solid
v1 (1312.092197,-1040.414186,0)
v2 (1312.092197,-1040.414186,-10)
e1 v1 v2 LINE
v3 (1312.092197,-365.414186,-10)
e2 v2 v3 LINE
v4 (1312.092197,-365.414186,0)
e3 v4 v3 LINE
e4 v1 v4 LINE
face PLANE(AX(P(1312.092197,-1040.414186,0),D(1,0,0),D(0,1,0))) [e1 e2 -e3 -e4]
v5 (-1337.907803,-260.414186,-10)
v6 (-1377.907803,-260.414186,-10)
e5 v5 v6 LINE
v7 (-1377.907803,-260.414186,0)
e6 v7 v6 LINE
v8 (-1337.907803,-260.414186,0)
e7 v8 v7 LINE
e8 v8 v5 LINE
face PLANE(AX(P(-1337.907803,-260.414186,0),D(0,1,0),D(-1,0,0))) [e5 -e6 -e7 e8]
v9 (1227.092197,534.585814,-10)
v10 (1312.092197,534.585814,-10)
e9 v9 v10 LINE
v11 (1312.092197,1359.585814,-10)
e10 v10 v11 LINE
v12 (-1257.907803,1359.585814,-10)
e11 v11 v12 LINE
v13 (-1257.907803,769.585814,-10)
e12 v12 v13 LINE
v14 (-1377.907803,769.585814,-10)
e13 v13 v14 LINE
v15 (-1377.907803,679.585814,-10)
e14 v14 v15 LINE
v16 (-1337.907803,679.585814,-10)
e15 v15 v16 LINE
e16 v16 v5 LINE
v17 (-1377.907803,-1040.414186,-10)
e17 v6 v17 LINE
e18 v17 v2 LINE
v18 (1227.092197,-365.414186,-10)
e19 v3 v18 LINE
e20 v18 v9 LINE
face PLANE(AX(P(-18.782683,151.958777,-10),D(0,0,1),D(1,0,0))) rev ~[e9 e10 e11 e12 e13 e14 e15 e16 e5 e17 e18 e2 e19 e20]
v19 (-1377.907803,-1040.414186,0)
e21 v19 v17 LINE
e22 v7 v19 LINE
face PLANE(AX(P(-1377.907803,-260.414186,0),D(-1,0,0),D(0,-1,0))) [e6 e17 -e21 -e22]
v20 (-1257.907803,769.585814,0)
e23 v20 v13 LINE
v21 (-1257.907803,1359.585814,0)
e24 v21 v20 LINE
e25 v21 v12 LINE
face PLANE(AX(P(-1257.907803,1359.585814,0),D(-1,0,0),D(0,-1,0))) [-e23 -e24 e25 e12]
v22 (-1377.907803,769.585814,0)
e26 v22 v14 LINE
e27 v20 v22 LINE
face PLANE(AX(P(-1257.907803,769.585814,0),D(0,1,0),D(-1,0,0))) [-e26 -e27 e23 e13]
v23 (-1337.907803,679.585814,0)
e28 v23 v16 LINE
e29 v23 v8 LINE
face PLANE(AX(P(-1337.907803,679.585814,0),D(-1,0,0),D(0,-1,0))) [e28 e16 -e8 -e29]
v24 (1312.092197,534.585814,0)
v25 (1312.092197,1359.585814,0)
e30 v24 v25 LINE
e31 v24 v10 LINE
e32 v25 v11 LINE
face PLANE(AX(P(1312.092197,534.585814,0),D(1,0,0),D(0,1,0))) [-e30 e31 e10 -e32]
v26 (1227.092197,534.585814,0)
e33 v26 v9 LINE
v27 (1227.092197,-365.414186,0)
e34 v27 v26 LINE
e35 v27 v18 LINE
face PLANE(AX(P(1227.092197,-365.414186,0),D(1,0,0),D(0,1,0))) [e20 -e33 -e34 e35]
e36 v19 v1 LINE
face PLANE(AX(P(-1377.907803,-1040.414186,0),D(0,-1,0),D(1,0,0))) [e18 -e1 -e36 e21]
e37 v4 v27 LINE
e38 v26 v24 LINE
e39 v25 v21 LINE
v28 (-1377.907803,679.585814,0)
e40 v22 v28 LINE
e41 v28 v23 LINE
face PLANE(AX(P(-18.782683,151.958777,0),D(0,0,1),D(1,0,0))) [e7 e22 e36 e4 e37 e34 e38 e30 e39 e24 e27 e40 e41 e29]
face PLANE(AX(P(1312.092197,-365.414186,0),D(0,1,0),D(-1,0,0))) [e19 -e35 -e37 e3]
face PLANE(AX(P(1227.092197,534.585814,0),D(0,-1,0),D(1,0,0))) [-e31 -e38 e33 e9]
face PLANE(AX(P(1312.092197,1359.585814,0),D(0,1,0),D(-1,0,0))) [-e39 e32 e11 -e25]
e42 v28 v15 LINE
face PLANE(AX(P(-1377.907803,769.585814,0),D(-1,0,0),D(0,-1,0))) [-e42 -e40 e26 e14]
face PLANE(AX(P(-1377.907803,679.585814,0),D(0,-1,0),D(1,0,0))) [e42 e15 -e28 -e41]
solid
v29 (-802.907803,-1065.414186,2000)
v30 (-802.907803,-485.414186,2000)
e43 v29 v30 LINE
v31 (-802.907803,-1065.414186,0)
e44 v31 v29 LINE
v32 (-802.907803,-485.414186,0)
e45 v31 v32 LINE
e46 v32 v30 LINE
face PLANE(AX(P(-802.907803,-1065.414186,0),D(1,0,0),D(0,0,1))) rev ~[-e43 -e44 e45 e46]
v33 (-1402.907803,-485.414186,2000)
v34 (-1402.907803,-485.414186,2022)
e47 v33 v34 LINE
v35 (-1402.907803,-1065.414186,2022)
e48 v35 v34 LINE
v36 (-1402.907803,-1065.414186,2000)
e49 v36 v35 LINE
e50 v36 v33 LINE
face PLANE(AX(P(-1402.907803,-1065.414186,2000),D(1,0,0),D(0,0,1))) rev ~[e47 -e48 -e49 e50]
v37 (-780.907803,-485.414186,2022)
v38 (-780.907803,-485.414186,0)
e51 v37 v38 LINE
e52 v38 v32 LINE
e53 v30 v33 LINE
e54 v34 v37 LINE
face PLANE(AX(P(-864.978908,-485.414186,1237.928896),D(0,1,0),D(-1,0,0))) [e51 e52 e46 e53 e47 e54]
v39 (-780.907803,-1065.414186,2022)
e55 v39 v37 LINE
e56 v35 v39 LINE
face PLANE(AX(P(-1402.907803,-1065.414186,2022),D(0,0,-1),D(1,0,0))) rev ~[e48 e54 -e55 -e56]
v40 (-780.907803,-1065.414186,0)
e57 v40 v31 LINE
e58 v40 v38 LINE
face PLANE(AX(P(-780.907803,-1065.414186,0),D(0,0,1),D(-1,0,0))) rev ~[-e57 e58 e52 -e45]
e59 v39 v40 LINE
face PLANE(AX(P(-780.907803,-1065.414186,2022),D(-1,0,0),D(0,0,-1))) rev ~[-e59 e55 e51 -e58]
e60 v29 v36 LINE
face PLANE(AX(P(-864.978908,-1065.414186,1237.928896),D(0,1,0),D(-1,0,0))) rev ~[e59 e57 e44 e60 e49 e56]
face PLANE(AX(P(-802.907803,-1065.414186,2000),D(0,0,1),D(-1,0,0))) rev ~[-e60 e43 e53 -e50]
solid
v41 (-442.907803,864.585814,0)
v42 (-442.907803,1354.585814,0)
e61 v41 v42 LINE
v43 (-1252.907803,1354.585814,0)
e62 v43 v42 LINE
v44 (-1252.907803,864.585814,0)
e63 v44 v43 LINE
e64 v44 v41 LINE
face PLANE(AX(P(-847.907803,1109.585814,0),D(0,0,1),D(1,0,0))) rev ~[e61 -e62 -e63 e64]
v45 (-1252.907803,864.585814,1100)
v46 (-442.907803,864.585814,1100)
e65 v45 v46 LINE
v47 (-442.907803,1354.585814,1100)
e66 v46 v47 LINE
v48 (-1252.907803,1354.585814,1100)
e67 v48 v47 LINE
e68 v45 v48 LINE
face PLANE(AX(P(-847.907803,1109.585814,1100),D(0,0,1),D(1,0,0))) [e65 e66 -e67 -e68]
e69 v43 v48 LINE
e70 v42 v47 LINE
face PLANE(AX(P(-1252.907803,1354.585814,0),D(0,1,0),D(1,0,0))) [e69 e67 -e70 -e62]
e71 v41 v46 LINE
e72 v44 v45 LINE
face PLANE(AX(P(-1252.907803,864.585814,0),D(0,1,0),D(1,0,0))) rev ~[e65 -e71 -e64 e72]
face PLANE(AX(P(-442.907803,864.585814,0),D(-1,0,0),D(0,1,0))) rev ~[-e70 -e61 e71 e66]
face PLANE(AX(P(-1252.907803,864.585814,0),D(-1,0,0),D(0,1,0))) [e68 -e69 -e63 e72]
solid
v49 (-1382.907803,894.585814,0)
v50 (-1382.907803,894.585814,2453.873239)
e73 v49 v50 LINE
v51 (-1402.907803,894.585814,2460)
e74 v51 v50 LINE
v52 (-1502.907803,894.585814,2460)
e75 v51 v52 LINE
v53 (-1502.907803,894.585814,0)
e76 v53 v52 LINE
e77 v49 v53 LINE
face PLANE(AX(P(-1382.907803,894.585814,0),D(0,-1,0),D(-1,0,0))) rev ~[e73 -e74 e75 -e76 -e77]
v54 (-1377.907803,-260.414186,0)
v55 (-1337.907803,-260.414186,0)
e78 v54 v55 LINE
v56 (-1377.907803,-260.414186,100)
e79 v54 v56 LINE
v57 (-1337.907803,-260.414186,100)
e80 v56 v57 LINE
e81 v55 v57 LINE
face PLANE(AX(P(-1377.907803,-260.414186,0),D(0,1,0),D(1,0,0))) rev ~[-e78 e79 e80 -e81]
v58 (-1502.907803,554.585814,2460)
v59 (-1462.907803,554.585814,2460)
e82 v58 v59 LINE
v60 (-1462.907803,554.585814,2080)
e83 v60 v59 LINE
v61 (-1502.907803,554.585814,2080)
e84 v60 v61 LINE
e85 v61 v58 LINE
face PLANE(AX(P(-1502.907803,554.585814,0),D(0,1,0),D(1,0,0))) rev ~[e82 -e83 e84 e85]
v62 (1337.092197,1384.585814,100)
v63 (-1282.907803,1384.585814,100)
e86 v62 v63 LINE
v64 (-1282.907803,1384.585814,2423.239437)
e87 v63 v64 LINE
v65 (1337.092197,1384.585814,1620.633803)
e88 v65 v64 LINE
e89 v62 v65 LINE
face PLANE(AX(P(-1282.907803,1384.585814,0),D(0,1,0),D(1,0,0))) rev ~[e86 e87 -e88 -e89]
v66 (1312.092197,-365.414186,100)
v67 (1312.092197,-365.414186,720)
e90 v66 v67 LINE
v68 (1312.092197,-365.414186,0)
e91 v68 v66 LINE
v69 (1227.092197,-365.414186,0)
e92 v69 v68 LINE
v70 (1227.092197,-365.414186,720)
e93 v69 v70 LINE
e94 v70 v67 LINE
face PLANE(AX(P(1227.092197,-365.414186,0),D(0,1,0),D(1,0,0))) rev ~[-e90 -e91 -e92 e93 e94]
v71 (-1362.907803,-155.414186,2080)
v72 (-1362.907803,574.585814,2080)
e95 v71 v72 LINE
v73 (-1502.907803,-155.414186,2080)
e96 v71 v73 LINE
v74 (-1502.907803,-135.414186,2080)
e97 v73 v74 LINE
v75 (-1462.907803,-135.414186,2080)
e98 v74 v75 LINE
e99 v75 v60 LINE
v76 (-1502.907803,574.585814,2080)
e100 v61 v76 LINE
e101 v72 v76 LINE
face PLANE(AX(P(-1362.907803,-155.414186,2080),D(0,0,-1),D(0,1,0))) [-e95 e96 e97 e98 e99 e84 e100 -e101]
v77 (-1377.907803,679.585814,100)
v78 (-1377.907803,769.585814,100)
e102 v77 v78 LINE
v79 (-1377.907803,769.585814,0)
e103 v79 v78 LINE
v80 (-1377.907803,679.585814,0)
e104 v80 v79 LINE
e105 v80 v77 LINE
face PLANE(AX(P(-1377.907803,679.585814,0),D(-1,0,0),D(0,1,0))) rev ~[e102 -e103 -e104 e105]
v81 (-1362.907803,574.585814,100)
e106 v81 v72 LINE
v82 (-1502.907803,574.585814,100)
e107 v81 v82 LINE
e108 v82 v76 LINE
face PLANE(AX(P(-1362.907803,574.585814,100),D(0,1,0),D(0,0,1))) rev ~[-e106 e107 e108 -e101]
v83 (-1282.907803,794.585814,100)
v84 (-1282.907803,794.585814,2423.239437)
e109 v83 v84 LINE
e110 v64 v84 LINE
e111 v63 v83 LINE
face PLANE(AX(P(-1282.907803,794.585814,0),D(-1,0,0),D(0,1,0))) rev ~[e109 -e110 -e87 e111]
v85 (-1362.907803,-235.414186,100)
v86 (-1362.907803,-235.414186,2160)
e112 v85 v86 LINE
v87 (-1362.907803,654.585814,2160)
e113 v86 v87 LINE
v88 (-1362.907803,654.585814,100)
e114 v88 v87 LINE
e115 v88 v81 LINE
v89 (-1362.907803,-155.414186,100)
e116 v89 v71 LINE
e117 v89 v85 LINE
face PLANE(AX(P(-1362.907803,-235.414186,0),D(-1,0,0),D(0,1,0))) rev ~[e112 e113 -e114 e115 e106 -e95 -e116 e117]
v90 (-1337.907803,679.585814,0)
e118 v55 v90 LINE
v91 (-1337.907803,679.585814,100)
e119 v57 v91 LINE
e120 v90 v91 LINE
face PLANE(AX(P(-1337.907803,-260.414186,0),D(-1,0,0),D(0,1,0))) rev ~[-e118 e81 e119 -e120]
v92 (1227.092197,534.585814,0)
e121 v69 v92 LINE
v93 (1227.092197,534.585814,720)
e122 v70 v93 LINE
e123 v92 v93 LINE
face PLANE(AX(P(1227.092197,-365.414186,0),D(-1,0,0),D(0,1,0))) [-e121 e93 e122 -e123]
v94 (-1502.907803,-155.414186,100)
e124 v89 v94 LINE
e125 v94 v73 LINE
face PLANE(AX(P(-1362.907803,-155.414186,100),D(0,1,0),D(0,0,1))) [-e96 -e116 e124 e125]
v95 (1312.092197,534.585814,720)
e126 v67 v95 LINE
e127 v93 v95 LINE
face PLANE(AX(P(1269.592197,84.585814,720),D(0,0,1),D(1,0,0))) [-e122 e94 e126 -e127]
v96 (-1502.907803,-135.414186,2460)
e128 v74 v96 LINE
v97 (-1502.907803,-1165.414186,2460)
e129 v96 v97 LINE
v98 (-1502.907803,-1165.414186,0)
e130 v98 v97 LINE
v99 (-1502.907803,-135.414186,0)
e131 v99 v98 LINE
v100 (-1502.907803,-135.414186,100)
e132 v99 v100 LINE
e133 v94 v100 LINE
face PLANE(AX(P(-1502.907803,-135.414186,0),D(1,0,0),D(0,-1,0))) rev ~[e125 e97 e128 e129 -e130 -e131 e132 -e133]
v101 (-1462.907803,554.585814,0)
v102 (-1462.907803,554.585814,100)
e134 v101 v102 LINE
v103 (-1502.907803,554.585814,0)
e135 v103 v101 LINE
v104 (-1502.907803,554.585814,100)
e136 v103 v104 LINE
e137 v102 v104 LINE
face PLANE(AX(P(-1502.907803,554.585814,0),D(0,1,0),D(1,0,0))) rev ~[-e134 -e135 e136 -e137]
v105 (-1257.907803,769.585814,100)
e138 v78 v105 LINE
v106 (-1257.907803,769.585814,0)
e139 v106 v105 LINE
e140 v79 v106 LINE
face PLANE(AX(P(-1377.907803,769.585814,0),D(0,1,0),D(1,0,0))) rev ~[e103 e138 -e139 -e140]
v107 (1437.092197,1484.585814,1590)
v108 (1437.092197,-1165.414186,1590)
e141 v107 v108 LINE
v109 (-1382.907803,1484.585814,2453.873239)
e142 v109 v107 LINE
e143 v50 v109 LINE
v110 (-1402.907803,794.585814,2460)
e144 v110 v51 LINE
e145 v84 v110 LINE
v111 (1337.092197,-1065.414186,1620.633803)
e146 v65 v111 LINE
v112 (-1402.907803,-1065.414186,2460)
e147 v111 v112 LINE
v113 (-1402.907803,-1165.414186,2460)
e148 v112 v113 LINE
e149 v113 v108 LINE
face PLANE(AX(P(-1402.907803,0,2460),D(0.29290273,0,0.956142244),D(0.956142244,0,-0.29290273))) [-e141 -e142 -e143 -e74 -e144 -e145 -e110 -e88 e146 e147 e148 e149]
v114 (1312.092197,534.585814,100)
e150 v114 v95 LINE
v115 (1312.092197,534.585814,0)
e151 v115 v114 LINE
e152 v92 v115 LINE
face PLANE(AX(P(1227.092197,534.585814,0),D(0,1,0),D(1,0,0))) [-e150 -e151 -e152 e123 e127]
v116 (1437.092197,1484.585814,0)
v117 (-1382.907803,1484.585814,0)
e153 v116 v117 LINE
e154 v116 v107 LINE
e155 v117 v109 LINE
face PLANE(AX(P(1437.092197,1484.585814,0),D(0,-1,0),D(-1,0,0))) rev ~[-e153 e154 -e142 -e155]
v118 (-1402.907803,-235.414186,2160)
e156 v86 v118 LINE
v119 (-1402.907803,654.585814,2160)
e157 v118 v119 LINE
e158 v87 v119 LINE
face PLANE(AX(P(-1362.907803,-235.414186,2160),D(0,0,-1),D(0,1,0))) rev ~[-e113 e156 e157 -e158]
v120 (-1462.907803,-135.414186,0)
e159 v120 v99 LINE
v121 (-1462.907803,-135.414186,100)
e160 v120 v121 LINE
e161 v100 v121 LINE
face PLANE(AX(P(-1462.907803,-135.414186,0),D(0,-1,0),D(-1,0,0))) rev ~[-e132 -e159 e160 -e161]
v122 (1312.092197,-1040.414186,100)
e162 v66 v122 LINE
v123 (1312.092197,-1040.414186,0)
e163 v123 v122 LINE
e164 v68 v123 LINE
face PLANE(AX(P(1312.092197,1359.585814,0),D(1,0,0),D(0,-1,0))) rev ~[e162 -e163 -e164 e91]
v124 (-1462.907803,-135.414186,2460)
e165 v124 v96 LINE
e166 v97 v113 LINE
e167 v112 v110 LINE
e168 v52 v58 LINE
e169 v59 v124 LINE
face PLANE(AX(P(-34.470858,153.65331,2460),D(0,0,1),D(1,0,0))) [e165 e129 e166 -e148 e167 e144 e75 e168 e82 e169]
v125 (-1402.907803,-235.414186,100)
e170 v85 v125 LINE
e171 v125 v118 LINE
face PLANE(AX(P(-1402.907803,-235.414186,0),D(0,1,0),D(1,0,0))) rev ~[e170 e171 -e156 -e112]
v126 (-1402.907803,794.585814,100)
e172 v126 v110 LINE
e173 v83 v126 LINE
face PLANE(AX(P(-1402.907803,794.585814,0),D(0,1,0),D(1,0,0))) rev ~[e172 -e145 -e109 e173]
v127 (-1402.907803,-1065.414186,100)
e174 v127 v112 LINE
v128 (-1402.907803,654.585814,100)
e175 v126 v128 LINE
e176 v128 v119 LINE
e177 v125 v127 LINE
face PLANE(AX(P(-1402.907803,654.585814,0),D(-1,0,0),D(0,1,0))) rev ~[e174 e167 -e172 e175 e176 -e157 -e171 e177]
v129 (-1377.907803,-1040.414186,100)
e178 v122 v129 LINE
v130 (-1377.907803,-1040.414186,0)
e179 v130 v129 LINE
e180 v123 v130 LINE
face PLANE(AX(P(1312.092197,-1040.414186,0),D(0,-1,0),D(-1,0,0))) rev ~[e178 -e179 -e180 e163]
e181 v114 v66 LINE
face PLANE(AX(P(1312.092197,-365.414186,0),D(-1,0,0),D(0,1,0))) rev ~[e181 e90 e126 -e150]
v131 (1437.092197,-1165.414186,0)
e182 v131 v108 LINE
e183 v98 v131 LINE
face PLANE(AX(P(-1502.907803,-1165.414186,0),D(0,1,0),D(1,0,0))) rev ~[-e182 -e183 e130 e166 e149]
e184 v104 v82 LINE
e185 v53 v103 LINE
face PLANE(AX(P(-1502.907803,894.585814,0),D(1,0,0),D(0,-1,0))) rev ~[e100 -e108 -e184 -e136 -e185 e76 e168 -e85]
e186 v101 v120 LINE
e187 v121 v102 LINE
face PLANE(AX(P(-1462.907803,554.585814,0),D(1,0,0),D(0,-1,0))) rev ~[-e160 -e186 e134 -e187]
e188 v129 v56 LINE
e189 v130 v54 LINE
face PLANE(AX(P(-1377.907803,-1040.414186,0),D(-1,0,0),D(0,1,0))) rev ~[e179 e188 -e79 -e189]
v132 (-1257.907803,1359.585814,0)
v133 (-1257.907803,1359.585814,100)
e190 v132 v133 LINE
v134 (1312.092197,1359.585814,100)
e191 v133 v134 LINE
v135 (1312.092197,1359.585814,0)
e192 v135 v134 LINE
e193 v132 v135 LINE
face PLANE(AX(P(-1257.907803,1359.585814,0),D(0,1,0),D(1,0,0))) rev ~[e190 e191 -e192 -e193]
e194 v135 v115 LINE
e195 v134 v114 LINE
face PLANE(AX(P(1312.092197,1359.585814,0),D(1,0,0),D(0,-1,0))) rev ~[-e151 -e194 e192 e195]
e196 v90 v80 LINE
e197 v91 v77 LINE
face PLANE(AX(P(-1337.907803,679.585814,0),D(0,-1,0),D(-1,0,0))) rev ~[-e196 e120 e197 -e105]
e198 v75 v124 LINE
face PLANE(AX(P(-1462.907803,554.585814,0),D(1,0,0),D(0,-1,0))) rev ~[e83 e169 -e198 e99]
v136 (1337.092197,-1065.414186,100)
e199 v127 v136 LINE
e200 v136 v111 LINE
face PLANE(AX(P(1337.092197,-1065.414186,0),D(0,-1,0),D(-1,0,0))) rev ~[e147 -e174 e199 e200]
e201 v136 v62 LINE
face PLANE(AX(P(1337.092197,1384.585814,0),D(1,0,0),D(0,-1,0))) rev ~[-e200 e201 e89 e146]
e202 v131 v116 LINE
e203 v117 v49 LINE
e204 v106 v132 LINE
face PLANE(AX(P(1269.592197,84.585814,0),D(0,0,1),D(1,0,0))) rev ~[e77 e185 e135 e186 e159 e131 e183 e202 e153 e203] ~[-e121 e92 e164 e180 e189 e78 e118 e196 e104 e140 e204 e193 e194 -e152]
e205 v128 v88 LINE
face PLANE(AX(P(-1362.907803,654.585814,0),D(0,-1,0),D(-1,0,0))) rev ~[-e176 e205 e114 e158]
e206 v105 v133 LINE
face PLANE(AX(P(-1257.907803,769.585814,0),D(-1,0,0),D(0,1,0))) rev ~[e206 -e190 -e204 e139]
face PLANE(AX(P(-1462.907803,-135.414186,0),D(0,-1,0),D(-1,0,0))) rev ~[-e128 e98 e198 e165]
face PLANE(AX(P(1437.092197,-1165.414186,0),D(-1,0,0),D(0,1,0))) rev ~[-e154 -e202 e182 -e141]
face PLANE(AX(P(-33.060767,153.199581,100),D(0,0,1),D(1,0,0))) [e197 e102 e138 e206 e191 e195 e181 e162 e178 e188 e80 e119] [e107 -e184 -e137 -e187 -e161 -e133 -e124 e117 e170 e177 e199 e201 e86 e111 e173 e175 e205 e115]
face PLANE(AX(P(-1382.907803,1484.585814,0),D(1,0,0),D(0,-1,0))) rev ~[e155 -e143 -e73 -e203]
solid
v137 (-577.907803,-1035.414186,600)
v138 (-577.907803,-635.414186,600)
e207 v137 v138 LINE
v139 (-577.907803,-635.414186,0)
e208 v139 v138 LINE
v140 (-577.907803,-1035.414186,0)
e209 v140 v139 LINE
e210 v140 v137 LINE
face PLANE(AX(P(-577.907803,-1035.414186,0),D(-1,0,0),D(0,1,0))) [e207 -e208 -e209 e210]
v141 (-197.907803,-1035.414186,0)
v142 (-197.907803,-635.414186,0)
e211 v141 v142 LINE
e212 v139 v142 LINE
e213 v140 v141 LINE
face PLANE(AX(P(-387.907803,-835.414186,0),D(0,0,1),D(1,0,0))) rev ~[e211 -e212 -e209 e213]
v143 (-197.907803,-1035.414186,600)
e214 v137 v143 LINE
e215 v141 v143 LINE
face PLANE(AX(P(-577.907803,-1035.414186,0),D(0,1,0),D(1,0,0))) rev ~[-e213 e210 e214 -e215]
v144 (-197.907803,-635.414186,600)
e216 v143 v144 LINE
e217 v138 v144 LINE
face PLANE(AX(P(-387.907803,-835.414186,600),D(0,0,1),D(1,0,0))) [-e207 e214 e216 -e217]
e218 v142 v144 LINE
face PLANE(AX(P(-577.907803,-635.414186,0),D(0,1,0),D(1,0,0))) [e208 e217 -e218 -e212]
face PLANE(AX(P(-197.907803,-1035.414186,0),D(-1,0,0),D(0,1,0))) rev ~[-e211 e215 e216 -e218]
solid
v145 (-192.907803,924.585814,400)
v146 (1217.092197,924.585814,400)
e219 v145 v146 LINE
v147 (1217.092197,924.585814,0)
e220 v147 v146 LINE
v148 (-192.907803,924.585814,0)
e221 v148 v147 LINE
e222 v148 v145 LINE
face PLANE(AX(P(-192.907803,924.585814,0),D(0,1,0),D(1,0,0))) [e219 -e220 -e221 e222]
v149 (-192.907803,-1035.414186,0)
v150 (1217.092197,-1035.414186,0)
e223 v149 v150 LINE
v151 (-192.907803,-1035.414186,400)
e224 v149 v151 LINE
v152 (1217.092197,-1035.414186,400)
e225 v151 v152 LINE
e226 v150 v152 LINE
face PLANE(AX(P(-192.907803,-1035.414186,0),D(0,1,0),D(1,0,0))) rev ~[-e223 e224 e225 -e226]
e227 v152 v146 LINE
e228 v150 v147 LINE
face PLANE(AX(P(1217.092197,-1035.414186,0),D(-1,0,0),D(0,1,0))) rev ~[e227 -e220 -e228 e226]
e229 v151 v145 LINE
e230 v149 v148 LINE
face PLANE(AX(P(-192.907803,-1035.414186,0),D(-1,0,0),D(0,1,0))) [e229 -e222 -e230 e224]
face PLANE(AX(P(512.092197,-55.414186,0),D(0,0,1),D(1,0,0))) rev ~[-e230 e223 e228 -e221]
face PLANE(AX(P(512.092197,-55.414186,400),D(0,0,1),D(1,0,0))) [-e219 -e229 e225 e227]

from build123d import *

# Parameters (mm, degrees)
F1_DEPTH      = 100
F2_DEPTH      = 2460
F0_W          = 85
F0_H          = 900
F3_DEPTH      = 720
F4_DEPTH      = 10
F6_DEPTH      = 1484.5868141508
F6_DEPTH_BACK = 1165.4151858492
F7_W          = 890
F7_H          = 300
F8_DEPTH      = 40
F9_W          = 730
F9_H          = 1980
F10_DEPTH     = 140.001
F12_W         = 810
F12_H         = 490
F13_DEPTH     = 1100
F12_W_2       = 1410
F12_H_2       = 1960
F14_DEPTH     = 400
F12_W_3       = 380
F12_H_3       = 400
F15_DEPTH     = 600
F17_DEPTH     = 580


with BuildPart() as f1:
    # F0 (on Top) → F1 (new body)
    with BuildSketch(Plane.XY):
        Polygon((1337.0921968033, 1384.5858141508), (-1282.9078031967, 1384.5858141508), (-1282.9078031967, 794.5858141508), (-1402.9078031967, 794.5858141508), (-1402.9078031967, 654.5858141508), (-1362.9078031967, 654.5858141508), (-1362.9078031967, -235.4141858492), (-1402.9078031967, -235.4141858492), (-1402.9078031967, -1065.4141858492), (1337.0921968033, -1065.4141858492), align=None)
        Polygon((-1377.9078031967, 769.5858141508), (-1257.9078031967, 769.5858141508), (-1257.9078031967, 1359.5858141508), (1312.0921968033, 1359.5858141508), (1312.0921968033, 534.5858141508), (1312.0921968033, -365.4141858492), (1312.0921968033, -1040.4141858492), (-1377.9078031967, -1040.4141858492), (-1377.9078031967, -260.4141858492), (-1337.9078031967, -260.4141858492), (-1337.9078031967, 679.5858141508), (-1377.9078031967, 679.5858141508), align=None, mode=Mode.SUBTRACT)
    extrude(amount=F1_DEPTH)

    # F0 (on Top) → F2 (join)
    with BuildSketch(Plane.XY):
        Polygon((-1502.9078031967, -135.4141858492), (-1502.9078031967, -1165.4141858492), (1437.0921968033, -1165.4141858492), (1437.0921968033, 1484.5858141508), (-1382.9078031967, 1484.5858141508), (-1382.9078031967, 894.5858141508), (-1502.9078031967, 894.5858141508), (-1502.9078031967, 554.5858141508), (-1462.9078031967, 554.5858141508), (-1462.9078031967, -135.4141858492), align=None)
        Polygon((-1282.9078031967, 794.5858141508), (-1282.9078031967, 1384.5858141508), (1337.0921968033, 1384.5858141508), (1337.0921968033, -1065.4141858492), (-1402.9078031967, -1065.4141858492), (-1402.9078031967, -235.4141858492), (-1362.9078031967, -235.4141858492), (-1362.9078031967, 654.5858141508), (-1402.9078031967, 654.5858141508), (-1402.9078031967, 794.5858141508), align=None, mode=Mode.SUBTRACT)
    extrude(amount=F2_DEPTH)

    # F0 (on Top) → F3 (join)
    with BuildSketch(Plane.XY):
        with Locations((1269.5921968033, 84.5858141508)):
            Rectangle(F0_W, F0_H)
    extrude(amount=F3_DEPTH)

    # F5 (on Front) → F6 (cut, two sides)
    with BuildSketch(Plane.XZ) as f6_sk:
        Polygon((1437.0921968033, 2460), (-1402.9078031967, 2460), (1437.0921968033, 1590), align=None)
    extrude(amount=-F6_DEPTH, mode=Mode.SUBTRACT)
    extrude(f6_sk.sketch, amount=F6_DEPTH_BACK, mode=Mode.SUBTRACT)

    # F7 (on face) → F8 (cut, through all)
    with BuildSketch(Plane.YZ.offset(-1362.9078031967)):
        with Locations((209.5858141508, 2310)):
            Rectangle(F7_W, F7_H)
    extrude(amount=-F8_DEPTH, mode=Mode.SUBTRACT)

    # F9 (on face) → F10 (cut, through all)
    with BuildSketch(Plane.YZ.offset(-1362.9078031967)):
        with Locations((209.5858141508, 1090)):
            Rectangle(F9_W, F9_H)
    extrude(amount=-F10_DEPTH, mode=Mode.SUBTRACT)


with BuildPart() as f4:
    # F0 (on Top) → F4 (new body)
    with BuildSketch(Plane.XY):
        Polygon((-1257.9078031967, 1359.5858141508), (-1257.9078031967, 769.5858141508), (-1377.9078031967, 769.5858141508), (-1377.9078031967, 679.5858141508), (-1337.9078031967, 679.5858141508), (-1337.9078031967, -260.4141858492), (-1377.9078031967, -260.4141858492), (-1377.9078031967, -1040.4141858492), (1312.0921968033, -1040.4141858492), (1312.0921968033, -365.4141858492), (1227.0921968033, -365.4141858492), (1227.0921968033, 534.5858141508), (1312.0921968033, 534.5858141508), (1312.0921968033, 1359.5858141508), align=None)
    extrude(amount=-F4_DEPTH)


with BuildPart() as f13:
    # F12 (on face) → F13 (new body)
    with BuildSketch(Plane.XY):
        with Locations((-847.9078031967, 1109.5858141508)):
            Rectangle(F12_W, F12_H)
    extrude(amount=F13_DEPTH)


with BuildPart() as f14:
    # F12 (on face) → F14 (new body)
    with BuildSketch(Plane.XY):
        with Locations((512.0921968033, -55.4141858492)):
            Rectangle(F12_W_2, F12_H_2)
    extrude(amount=F14_DEPTH)


with BuildPart() as f15:
    # F12 (on face) → F15 (new body)
    with BuildSketch(Plane.XY):
        with Locations((-387.9078031967, -835.4141858492)):
            Rectangle(F12_W_3, F12_H_3)
    extrude(amount=F15_DEPTH)


with BuildPart() as f17:
    # F16 (on face) → F17 (new body)
    with BuildSketch(Plane(origin=(0, -1065.4141858492, 0), x_dir=(-1, 0, 0), z_dir=(0, 1, 0))):
        Polygon((802.9078031967, 2000), (1402.9078031967, 2000), (1402.9078031967, 2022), (780.9078031967, 2022), (780.9078031967, 0), (802.9078031967, 0), align=None)
    extrude(amount=F17_DEPTH)


solid = Compound([f1.part, f4.part, f13.part, f14.part, f15.part, f17.part])
